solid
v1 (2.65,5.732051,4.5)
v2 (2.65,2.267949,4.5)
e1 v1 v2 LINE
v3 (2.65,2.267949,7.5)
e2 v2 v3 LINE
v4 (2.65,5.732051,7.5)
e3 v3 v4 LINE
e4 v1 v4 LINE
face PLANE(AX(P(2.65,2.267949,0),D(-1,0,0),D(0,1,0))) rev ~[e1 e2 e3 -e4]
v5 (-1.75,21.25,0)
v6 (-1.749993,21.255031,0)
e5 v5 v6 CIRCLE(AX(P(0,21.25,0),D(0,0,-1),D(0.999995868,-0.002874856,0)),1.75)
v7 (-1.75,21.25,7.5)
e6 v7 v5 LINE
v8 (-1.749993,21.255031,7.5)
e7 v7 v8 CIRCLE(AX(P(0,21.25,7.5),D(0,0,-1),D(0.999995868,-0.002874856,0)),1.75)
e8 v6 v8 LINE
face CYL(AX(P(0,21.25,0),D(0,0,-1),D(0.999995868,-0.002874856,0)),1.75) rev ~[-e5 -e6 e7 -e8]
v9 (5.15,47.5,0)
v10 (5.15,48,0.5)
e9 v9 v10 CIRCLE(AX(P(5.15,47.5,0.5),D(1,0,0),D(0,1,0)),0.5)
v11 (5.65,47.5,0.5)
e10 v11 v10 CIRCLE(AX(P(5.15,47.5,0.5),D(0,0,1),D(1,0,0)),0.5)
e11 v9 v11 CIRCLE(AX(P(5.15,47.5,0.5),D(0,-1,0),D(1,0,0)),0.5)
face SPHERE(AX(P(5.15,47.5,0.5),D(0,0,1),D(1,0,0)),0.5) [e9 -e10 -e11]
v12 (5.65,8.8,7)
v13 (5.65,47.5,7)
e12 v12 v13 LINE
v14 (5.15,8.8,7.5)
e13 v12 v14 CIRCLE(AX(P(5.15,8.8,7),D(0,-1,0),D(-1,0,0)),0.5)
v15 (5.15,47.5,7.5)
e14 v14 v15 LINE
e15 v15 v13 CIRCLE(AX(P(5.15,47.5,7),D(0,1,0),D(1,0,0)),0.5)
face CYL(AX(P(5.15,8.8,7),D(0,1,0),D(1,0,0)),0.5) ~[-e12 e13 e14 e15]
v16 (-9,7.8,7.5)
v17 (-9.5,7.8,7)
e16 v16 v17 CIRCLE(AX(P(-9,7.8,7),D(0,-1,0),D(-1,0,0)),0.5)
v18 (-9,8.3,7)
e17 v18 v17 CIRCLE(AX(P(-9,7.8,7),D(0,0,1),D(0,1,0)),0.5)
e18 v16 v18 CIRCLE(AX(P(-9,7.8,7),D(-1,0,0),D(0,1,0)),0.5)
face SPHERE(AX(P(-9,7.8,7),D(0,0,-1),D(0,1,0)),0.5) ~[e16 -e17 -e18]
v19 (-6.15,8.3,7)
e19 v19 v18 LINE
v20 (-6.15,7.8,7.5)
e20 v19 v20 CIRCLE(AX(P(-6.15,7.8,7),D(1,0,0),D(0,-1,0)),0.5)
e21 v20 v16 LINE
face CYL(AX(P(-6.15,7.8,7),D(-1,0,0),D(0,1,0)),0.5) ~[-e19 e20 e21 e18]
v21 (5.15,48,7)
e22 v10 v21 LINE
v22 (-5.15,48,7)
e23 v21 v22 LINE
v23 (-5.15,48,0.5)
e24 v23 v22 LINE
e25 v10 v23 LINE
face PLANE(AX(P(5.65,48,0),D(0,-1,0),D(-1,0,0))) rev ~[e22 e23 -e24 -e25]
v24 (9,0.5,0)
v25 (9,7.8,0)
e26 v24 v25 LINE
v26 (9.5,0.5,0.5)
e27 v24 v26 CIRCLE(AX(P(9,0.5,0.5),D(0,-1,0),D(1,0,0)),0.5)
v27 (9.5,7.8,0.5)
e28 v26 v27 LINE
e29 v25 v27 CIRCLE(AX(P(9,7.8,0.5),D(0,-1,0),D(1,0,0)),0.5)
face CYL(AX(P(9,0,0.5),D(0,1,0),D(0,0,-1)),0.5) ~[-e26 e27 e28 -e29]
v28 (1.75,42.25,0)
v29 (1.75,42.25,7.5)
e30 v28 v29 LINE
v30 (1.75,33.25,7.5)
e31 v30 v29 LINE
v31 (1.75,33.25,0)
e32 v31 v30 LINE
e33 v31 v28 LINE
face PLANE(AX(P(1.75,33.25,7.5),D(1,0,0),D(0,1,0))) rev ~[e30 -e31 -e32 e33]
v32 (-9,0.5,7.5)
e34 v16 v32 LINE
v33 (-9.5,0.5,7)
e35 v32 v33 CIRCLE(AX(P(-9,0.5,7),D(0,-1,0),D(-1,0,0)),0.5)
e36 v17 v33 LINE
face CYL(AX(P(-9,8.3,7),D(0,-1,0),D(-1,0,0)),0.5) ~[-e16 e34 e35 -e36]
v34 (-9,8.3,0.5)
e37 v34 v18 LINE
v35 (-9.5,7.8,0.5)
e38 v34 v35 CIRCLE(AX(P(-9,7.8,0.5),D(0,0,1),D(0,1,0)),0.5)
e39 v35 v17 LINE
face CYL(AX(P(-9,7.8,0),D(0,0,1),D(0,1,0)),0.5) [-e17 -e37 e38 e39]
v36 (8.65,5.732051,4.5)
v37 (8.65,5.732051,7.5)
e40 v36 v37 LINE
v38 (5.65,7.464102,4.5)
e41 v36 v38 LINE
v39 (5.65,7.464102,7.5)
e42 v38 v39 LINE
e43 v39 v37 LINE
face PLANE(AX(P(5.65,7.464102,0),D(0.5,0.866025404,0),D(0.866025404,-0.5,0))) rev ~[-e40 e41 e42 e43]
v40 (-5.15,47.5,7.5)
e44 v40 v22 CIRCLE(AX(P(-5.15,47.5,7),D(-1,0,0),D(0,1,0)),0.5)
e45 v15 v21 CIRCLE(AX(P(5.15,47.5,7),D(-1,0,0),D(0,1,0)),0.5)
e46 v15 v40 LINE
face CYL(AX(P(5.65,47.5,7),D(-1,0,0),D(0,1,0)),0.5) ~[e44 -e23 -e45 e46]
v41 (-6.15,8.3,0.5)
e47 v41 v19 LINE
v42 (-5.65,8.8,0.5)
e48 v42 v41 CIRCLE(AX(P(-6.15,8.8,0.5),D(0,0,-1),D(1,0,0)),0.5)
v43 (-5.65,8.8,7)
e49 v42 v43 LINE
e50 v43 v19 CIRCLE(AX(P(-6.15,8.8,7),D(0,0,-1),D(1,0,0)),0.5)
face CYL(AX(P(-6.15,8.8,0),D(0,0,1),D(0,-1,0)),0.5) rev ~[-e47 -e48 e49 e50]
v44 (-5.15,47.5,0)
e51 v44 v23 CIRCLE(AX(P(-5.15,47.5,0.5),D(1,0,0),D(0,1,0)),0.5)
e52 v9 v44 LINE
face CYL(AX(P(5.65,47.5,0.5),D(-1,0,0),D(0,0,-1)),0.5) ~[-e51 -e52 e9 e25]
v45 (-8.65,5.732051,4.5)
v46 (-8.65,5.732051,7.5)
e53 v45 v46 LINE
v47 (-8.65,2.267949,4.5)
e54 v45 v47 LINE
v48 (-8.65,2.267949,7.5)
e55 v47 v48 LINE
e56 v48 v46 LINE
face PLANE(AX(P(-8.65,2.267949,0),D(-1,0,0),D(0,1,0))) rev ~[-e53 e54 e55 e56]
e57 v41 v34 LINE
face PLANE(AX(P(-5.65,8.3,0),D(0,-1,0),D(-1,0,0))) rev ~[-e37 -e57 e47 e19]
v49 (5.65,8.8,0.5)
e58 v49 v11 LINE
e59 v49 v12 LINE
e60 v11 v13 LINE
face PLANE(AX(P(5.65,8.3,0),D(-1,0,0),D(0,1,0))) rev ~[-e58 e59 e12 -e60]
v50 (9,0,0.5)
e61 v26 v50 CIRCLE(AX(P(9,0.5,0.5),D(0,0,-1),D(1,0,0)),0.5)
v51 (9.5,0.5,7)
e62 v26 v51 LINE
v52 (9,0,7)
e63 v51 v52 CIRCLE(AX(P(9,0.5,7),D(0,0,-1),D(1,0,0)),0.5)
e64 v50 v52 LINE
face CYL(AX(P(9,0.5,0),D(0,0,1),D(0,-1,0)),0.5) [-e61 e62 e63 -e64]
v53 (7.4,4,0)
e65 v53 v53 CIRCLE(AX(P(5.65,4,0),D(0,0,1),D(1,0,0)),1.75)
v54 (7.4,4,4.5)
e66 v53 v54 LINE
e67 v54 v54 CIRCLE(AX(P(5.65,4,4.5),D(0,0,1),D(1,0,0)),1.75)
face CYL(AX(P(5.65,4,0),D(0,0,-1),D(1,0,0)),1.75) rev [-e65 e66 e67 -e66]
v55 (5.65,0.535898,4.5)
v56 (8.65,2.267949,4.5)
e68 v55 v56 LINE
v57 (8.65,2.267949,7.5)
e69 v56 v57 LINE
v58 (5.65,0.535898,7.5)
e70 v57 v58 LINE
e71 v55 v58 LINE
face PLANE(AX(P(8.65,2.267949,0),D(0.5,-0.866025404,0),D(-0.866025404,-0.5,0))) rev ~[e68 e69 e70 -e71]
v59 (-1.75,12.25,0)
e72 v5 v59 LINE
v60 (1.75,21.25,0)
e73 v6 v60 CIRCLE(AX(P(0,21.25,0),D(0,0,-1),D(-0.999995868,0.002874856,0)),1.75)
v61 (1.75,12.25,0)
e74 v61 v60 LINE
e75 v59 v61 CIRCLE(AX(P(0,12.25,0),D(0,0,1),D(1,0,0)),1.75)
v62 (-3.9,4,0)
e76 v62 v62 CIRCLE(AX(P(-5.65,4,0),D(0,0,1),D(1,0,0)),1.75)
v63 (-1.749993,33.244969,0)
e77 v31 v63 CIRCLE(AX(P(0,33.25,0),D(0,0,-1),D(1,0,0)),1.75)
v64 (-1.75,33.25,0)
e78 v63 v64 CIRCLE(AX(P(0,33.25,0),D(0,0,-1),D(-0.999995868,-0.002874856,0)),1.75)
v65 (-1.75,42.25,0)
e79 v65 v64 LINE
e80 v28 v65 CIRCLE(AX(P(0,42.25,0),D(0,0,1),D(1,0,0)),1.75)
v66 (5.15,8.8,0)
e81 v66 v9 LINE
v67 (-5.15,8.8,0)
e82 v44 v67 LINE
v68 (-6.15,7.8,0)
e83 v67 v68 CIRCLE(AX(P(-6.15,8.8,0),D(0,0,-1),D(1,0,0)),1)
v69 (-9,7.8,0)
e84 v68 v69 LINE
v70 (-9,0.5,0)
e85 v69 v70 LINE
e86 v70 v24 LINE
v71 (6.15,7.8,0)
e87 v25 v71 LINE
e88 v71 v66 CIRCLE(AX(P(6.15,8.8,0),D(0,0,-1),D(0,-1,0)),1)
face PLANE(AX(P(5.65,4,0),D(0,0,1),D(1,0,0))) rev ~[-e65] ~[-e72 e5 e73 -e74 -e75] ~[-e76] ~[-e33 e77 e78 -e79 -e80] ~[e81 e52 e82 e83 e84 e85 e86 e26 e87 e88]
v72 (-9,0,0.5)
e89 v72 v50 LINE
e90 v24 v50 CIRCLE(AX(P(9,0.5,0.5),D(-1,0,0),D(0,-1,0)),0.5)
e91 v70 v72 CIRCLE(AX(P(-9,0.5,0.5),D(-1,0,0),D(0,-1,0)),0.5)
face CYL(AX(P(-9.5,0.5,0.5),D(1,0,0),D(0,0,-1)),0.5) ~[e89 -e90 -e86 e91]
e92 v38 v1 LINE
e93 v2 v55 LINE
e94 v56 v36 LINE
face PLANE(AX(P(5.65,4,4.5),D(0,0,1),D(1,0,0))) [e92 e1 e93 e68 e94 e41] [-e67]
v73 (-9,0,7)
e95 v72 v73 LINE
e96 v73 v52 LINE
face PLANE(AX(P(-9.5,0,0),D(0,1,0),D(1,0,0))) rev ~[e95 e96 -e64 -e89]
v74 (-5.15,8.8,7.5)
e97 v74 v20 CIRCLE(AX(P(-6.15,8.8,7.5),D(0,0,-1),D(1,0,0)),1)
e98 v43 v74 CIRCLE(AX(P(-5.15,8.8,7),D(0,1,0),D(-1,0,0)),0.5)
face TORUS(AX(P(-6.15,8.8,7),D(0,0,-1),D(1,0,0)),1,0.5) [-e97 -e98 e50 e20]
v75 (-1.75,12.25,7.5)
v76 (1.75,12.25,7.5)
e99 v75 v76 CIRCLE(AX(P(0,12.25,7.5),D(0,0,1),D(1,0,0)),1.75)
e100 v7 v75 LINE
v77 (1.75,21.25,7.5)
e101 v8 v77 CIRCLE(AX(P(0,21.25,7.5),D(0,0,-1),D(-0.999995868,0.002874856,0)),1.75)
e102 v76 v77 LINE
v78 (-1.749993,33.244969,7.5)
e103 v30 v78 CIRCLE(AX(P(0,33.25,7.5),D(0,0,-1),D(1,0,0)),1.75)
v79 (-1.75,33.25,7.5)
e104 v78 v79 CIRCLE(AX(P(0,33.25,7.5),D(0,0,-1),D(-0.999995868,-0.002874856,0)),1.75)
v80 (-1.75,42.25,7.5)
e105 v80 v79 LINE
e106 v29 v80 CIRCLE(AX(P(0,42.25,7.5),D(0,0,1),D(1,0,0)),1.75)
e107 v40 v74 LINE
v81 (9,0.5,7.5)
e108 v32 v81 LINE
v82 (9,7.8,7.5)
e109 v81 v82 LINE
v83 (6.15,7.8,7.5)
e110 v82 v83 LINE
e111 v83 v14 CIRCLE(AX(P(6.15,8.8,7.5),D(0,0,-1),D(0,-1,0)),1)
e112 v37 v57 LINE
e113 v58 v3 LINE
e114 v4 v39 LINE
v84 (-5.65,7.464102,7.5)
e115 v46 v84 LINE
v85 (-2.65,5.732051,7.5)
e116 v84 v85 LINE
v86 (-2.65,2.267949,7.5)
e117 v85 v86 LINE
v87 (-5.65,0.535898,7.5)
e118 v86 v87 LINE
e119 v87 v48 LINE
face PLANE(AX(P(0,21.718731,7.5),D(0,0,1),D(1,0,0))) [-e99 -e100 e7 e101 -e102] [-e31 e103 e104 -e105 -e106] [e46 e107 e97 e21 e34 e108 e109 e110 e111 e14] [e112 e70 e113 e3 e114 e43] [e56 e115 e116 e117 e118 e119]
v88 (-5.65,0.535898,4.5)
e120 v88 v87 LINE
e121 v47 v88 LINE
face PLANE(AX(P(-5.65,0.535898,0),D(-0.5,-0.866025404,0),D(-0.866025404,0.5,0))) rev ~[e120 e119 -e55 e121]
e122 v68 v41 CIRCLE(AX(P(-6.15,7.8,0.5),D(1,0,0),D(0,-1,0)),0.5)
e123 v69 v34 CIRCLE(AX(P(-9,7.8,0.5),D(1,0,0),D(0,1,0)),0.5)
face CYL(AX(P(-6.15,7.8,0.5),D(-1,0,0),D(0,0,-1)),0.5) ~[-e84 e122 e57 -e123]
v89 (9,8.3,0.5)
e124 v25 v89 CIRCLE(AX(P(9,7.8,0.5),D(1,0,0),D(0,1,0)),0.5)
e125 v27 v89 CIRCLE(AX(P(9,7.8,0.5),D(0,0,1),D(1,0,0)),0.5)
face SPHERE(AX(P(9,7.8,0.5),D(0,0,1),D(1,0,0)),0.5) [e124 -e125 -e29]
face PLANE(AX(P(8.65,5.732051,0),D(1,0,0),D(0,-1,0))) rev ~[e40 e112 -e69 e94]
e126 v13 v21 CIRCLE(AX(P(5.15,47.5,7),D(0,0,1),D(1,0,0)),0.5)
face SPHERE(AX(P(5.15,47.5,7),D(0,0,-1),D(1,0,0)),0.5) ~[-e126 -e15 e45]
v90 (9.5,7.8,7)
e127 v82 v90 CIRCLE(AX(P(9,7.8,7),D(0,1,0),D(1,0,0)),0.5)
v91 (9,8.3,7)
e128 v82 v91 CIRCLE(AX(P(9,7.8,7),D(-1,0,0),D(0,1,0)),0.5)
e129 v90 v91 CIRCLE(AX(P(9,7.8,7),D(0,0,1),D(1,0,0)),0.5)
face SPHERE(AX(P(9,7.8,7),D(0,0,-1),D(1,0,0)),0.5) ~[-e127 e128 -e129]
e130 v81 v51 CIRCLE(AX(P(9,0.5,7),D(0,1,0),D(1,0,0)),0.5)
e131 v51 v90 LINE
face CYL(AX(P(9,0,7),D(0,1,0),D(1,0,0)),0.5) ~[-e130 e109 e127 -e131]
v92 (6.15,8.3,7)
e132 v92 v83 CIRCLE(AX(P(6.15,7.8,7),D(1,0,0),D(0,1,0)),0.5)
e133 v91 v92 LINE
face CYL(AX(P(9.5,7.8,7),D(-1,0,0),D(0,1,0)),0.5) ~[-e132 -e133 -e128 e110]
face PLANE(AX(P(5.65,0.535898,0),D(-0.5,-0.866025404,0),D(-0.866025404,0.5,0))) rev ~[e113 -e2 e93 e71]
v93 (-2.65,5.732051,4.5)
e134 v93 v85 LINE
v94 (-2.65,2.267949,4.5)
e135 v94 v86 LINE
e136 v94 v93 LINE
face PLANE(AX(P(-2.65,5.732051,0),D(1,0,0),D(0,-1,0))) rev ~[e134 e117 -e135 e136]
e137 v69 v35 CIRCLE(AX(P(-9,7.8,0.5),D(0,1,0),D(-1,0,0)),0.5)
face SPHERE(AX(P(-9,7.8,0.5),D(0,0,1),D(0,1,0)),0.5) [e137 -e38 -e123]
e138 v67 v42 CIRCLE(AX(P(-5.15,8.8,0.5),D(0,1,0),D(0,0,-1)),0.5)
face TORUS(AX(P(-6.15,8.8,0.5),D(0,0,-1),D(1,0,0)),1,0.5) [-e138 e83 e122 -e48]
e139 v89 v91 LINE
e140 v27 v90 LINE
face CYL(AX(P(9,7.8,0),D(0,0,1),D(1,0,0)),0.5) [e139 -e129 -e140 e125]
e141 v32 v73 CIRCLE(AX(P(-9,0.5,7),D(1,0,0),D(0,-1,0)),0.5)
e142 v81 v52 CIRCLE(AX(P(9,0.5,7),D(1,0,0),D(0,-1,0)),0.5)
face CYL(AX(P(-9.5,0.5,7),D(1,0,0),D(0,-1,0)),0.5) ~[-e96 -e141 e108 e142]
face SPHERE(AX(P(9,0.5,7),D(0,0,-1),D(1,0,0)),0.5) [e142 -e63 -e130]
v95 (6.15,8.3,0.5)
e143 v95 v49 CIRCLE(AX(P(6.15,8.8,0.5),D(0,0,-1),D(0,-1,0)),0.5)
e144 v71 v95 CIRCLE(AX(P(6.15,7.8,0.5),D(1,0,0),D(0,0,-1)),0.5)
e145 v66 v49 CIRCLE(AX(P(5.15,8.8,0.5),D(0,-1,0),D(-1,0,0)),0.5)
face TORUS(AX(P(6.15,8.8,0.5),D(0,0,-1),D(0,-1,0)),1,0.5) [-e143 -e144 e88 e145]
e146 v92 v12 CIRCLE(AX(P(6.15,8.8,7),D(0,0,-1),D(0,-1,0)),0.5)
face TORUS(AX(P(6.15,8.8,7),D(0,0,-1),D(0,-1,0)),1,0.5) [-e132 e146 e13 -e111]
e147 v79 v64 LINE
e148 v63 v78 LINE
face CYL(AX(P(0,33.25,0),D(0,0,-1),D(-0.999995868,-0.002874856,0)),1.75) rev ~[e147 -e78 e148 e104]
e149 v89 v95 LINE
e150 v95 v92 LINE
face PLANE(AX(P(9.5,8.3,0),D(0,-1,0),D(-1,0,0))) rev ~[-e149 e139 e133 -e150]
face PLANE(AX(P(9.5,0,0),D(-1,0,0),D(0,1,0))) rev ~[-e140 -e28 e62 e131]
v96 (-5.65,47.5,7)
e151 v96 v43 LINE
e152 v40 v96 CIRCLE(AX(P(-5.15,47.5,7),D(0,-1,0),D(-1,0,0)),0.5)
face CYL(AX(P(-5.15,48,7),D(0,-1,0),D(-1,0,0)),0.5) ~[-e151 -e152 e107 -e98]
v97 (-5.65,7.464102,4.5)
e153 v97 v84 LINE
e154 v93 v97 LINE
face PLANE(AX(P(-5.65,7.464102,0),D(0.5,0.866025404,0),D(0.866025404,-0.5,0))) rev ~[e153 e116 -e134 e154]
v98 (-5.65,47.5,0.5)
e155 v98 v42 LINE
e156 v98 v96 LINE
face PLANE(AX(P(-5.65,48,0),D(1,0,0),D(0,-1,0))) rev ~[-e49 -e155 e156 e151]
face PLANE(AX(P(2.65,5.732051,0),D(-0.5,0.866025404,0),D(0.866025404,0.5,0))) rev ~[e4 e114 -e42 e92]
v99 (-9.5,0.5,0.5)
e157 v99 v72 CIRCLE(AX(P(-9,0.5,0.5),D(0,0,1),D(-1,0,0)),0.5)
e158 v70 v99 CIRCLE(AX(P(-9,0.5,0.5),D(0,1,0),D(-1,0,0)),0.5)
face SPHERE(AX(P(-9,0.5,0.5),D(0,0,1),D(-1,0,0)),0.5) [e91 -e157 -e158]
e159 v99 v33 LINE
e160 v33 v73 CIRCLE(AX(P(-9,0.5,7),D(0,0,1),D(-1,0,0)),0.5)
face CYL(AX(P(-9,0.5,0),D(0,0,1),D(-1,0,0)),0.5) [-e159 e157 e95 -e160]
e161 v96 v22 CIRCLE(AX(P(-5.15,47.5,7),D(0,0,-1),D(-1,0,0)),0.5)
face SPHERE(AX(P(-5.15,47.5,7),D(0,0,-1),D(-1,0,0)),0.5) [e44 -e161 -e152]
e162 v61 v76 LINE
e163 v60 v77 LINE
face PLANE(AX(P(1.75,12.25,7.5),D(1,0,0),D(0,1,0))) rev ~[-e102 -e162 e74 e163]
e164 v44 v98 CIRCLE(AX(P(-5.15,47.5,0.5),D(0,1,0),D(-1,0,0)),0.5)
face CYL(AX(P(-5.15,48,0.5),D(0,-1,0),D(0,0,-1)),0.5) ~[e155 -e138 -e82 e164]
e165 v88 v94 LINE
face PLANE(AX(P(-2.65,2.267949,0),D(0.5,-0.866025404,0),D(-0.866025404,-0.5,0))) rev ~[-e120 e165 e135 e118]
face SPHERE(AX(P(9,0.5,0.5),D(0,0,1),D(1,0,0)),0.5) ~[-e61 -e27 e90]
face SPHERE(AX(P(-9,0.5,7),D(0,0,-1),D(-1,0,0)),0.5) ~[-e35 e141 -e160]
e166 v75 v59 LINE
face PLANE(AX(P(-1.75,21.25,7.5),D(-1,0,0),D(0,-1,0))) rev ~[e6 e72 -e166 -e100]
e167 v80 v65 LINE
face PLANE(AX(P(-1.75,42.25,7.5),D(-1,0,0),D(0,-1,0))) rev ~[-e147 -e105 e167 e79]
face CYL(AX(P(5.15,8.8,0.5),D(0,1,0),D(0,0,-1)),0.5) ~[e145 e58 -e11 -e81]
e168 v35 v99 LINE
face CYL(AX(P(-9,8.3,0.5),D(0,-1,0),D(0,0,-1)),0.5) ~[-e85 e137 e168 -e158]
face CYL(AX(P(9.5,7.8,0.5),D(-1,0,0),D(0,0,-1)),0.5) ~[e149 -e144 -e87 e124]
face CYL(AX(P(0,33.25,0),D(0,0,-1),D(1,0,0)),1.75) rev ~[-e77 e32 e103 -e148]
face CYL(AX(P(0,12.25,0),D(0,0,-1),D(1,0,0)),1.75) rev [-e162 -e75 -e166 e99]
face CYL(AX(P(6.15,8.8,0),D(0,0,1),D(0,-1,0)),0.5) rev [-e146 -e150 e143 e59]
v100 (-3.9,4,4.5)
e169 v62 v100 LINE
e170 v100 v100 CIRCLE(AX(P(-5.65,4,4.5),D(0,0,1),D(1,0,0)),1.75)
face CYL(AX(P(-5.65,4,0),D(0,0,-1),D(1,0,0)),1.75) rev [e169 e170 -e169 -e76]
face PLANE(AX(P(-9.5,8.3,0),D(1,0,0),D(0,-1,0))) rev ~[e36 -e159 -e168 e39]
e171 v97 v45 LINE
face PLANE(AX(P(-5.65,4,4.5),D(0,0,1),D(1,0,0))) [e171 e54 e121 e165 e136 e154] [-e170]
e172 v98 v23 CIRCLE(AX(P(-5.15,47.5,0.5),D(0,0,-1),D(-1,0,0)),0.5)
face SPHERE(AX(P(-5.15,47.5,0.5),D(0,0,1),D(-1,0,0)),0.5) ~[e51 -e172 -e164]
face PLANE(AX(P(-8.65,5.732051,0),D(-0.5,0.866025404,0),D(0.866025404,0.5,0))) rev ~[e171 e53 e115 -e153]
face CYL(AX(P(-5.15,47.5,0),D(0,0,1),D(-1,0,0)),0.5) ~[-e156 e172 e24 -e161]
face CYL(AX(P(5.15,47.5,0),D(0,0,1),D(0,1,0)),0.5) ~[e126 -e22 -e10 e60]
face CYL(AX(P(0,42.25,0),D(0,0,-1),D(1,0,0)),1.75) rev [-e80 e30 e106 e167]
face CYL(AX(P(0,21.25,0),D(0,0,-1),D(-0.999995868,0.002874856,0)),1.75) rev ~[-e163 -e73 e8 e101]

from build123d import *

# Parameters (mm, degrees)
F0_R     = 1.75
F1_DEPTH = 7.5
F2_DEPTH = 4.5
F3_DEPTH = 4.5
F5_DEPTH = 8.81
F7_DEPTH = 25
F8_F1_R  = 0.5
F8_F2_R  = 0.5


with BuildPart() as f1:
    # F0 (on Top) → F1 (new body)
    with BuildSketch(Plane.XY):
        Polygon((-9.5, 0), (-5.65, 0), (5.65, 0), (9.5, 0), (9.5, 8.3), (5.65, 8.3), (5.65, 10.5504491955), (5.65, 11.4643116325), (5.65, 48), (-5.65, 48), (-5.65, 8.3), (-9.5, 8.3), align=None)
        Polygon((-5.65, 7.4641016151), (-2.65, 5.7320508076), (-2.65, 2.2679491924), (-5.65, 0.5358983849), (-8.65, 2.2679491924), (-8.65, 5.7320508076), align=None, mode=Mode.SUBTRACT)
        Polygon((2.65, 5.7320508076), (5.65, 7.4641016151), (8.65, 5.7320508076), (8.65, 2.2679491924), (5.65, 0.5358983849), (2.65, 2.2679491924), align=None, mode=Mode.SUBTRACT)
        with Locations((0, 12.25)):
            Circle(F0_R, mode=Mode.SUBTRACT)
        with BuildLine():
            ThreePointArc((-1.7499927683, 21.255030998), (0.0025155016, 22.9999981921), (1.75, 21.25))
            ThreePointArc((1.75, 21.25), (1.7499981921, 21.2474844984), (1.7499927683, 21.244969002))
            ThreePointArc((1.7499927683, 21.244969002), (-0.005030998, 19.5000072317), (-1.7499927683, 21.255030998))
        make_face(mode=Mode.SUBTRACT)
        with BuildLine():
            ThreePointArc((-1.7499927683, 33.244969002), (-0.005030998, 34.9999927683), (1.7499927683, 33.255030998))
            ThreePointArc((1.7499927683, 33.255030998), (1.7499981921, 33.2525155016), (1.75, 33.25))
            ThreePointArc((1.75, 33.25), (0.0025155016, 31.5000018079), (-1.7499927683, 33.244969002))
        make_face(mode=Mode.SUBTRACT)
        with Locations((0, 42.25)):
            Circle(F0_R, mode=Mode.SUBTRACT)
    extrude(amount=F1_DEPTH)

    # F0 (on Top) → F2 (join)
    with BuildSketch(Plane.XY):
        Polygon((-2.65, 2.2679491924), (-2.65, 5.7320508076), (-5.65, 7.4641016151), (-8.65, 5.7320508076), (-8.65, 2.2679491924), (-5.65, 0.5358983849), align=None)
        with Locations((-5.65, 4)):
            Circle(F0_R, mode=Mode.SUBTRACT)
    extrude(amount=F2_DEPTH)

    # F0 (on Top) → F3 (join)
    with BuildSketch(Plane.XY):
        Polygon((8.65, 5.7320508076), (5.65, 7.4641016151), (2.65, 5.7320508076), (2.65, 2.2679491924), (5.65, 0.5358983849), (8.65, 2.2679491924), align=None)
        with Locations((5.65, 4)):
            Circle(F0_R, mode=Mode.SUBTRACT)
    extrude(amount=F3_DEPTH)

    # F4 (on face) → F5 (cut)
    with BuildSketch(Plane.XY.offset(7.5)):
        with BuildLine():
            Line((-1.75, 21.25), (-1.75, 12.25))
            ThreePointArc((-1.75, 12.25), (0, 14), (1.75, 12.25))
            Line((1.75, 12.25), (1.75, 21.25))
            ThreePointArc((1.75, 21.25), (0, 19.5), (-1.75, 21.25))
        make_face()
    extrude(amount=-F5_DEPTH, mode=Mode.SUBTRACT)

    # F6 (on face) → F7 (cut)
    with BuildSketch(Plane.XY.offset(7.5)):
        with BuildLine():
            Line((-1.75, 42.25), (-1.75, 33.25))
            ThreePointArc((-1.75, 33.25), (0, 35), (1.75, 33.25))
            Line((1.75, 33.25), (1.75, 42.25))
            ThreePointArc((1.75, 42.25), (0, 40.5), (-1.75, 42.25))
        make_face()
    extrude(amount=-F7_DEPTH, mode=Mode.SUBTRACT)

    # F8: fillet of radius 0.5 on 20 edges, made by hand

    # F8_f1
    f8_f1_edges = [f1.edges().sort_by_distance(p)[0] for p in [
        (5.65, 8.3, 3.75),
        (-5.65, 8.3, 3.75),
    ]]
    fillet(f8_f1_edges, radius=F8_F1_R)

    # F8_f2
    f8_f2_edges = [f1.edges().sort_by_distance(p)[0] for p in [
        (-5.65, 48, 3.75),
        (5.65, 48, 3.75),
        (9.5, 8.3, 3.75),
        (-9.5, 8.3, 3.75),
        (-9.5, 0, 3.75),
        (9.5, 0, 3.75),
        (9.5, 4.15, 0),
        (9.5, 4.15, 7.5),
        (5.65, 28.4, 7.5),
        (5.65, 28.4, 0),
        (-5.65, 28.4, 0),
        (-5.65, 28.4, 7.5),
        (-9.5, 4.15, 0),
        (-9.5, 4.15, 7.5),
        (0, 48, 0),
        (0, 48, 7.5),
        (0, 0, 7.5),
        (0, 0, 0),
        (-5.7964466094, 8.4464466094, 7.5),
        (-5.7964466094, 8.4464466094, 0),
        (5.7964466094, 8.4464466094, 0),
        (5.7964466094, 8.4464466094, 7.5),
    ]]
    fillet(f8_f2_edges, radius=F8_F2_R)


solid = f1.part
